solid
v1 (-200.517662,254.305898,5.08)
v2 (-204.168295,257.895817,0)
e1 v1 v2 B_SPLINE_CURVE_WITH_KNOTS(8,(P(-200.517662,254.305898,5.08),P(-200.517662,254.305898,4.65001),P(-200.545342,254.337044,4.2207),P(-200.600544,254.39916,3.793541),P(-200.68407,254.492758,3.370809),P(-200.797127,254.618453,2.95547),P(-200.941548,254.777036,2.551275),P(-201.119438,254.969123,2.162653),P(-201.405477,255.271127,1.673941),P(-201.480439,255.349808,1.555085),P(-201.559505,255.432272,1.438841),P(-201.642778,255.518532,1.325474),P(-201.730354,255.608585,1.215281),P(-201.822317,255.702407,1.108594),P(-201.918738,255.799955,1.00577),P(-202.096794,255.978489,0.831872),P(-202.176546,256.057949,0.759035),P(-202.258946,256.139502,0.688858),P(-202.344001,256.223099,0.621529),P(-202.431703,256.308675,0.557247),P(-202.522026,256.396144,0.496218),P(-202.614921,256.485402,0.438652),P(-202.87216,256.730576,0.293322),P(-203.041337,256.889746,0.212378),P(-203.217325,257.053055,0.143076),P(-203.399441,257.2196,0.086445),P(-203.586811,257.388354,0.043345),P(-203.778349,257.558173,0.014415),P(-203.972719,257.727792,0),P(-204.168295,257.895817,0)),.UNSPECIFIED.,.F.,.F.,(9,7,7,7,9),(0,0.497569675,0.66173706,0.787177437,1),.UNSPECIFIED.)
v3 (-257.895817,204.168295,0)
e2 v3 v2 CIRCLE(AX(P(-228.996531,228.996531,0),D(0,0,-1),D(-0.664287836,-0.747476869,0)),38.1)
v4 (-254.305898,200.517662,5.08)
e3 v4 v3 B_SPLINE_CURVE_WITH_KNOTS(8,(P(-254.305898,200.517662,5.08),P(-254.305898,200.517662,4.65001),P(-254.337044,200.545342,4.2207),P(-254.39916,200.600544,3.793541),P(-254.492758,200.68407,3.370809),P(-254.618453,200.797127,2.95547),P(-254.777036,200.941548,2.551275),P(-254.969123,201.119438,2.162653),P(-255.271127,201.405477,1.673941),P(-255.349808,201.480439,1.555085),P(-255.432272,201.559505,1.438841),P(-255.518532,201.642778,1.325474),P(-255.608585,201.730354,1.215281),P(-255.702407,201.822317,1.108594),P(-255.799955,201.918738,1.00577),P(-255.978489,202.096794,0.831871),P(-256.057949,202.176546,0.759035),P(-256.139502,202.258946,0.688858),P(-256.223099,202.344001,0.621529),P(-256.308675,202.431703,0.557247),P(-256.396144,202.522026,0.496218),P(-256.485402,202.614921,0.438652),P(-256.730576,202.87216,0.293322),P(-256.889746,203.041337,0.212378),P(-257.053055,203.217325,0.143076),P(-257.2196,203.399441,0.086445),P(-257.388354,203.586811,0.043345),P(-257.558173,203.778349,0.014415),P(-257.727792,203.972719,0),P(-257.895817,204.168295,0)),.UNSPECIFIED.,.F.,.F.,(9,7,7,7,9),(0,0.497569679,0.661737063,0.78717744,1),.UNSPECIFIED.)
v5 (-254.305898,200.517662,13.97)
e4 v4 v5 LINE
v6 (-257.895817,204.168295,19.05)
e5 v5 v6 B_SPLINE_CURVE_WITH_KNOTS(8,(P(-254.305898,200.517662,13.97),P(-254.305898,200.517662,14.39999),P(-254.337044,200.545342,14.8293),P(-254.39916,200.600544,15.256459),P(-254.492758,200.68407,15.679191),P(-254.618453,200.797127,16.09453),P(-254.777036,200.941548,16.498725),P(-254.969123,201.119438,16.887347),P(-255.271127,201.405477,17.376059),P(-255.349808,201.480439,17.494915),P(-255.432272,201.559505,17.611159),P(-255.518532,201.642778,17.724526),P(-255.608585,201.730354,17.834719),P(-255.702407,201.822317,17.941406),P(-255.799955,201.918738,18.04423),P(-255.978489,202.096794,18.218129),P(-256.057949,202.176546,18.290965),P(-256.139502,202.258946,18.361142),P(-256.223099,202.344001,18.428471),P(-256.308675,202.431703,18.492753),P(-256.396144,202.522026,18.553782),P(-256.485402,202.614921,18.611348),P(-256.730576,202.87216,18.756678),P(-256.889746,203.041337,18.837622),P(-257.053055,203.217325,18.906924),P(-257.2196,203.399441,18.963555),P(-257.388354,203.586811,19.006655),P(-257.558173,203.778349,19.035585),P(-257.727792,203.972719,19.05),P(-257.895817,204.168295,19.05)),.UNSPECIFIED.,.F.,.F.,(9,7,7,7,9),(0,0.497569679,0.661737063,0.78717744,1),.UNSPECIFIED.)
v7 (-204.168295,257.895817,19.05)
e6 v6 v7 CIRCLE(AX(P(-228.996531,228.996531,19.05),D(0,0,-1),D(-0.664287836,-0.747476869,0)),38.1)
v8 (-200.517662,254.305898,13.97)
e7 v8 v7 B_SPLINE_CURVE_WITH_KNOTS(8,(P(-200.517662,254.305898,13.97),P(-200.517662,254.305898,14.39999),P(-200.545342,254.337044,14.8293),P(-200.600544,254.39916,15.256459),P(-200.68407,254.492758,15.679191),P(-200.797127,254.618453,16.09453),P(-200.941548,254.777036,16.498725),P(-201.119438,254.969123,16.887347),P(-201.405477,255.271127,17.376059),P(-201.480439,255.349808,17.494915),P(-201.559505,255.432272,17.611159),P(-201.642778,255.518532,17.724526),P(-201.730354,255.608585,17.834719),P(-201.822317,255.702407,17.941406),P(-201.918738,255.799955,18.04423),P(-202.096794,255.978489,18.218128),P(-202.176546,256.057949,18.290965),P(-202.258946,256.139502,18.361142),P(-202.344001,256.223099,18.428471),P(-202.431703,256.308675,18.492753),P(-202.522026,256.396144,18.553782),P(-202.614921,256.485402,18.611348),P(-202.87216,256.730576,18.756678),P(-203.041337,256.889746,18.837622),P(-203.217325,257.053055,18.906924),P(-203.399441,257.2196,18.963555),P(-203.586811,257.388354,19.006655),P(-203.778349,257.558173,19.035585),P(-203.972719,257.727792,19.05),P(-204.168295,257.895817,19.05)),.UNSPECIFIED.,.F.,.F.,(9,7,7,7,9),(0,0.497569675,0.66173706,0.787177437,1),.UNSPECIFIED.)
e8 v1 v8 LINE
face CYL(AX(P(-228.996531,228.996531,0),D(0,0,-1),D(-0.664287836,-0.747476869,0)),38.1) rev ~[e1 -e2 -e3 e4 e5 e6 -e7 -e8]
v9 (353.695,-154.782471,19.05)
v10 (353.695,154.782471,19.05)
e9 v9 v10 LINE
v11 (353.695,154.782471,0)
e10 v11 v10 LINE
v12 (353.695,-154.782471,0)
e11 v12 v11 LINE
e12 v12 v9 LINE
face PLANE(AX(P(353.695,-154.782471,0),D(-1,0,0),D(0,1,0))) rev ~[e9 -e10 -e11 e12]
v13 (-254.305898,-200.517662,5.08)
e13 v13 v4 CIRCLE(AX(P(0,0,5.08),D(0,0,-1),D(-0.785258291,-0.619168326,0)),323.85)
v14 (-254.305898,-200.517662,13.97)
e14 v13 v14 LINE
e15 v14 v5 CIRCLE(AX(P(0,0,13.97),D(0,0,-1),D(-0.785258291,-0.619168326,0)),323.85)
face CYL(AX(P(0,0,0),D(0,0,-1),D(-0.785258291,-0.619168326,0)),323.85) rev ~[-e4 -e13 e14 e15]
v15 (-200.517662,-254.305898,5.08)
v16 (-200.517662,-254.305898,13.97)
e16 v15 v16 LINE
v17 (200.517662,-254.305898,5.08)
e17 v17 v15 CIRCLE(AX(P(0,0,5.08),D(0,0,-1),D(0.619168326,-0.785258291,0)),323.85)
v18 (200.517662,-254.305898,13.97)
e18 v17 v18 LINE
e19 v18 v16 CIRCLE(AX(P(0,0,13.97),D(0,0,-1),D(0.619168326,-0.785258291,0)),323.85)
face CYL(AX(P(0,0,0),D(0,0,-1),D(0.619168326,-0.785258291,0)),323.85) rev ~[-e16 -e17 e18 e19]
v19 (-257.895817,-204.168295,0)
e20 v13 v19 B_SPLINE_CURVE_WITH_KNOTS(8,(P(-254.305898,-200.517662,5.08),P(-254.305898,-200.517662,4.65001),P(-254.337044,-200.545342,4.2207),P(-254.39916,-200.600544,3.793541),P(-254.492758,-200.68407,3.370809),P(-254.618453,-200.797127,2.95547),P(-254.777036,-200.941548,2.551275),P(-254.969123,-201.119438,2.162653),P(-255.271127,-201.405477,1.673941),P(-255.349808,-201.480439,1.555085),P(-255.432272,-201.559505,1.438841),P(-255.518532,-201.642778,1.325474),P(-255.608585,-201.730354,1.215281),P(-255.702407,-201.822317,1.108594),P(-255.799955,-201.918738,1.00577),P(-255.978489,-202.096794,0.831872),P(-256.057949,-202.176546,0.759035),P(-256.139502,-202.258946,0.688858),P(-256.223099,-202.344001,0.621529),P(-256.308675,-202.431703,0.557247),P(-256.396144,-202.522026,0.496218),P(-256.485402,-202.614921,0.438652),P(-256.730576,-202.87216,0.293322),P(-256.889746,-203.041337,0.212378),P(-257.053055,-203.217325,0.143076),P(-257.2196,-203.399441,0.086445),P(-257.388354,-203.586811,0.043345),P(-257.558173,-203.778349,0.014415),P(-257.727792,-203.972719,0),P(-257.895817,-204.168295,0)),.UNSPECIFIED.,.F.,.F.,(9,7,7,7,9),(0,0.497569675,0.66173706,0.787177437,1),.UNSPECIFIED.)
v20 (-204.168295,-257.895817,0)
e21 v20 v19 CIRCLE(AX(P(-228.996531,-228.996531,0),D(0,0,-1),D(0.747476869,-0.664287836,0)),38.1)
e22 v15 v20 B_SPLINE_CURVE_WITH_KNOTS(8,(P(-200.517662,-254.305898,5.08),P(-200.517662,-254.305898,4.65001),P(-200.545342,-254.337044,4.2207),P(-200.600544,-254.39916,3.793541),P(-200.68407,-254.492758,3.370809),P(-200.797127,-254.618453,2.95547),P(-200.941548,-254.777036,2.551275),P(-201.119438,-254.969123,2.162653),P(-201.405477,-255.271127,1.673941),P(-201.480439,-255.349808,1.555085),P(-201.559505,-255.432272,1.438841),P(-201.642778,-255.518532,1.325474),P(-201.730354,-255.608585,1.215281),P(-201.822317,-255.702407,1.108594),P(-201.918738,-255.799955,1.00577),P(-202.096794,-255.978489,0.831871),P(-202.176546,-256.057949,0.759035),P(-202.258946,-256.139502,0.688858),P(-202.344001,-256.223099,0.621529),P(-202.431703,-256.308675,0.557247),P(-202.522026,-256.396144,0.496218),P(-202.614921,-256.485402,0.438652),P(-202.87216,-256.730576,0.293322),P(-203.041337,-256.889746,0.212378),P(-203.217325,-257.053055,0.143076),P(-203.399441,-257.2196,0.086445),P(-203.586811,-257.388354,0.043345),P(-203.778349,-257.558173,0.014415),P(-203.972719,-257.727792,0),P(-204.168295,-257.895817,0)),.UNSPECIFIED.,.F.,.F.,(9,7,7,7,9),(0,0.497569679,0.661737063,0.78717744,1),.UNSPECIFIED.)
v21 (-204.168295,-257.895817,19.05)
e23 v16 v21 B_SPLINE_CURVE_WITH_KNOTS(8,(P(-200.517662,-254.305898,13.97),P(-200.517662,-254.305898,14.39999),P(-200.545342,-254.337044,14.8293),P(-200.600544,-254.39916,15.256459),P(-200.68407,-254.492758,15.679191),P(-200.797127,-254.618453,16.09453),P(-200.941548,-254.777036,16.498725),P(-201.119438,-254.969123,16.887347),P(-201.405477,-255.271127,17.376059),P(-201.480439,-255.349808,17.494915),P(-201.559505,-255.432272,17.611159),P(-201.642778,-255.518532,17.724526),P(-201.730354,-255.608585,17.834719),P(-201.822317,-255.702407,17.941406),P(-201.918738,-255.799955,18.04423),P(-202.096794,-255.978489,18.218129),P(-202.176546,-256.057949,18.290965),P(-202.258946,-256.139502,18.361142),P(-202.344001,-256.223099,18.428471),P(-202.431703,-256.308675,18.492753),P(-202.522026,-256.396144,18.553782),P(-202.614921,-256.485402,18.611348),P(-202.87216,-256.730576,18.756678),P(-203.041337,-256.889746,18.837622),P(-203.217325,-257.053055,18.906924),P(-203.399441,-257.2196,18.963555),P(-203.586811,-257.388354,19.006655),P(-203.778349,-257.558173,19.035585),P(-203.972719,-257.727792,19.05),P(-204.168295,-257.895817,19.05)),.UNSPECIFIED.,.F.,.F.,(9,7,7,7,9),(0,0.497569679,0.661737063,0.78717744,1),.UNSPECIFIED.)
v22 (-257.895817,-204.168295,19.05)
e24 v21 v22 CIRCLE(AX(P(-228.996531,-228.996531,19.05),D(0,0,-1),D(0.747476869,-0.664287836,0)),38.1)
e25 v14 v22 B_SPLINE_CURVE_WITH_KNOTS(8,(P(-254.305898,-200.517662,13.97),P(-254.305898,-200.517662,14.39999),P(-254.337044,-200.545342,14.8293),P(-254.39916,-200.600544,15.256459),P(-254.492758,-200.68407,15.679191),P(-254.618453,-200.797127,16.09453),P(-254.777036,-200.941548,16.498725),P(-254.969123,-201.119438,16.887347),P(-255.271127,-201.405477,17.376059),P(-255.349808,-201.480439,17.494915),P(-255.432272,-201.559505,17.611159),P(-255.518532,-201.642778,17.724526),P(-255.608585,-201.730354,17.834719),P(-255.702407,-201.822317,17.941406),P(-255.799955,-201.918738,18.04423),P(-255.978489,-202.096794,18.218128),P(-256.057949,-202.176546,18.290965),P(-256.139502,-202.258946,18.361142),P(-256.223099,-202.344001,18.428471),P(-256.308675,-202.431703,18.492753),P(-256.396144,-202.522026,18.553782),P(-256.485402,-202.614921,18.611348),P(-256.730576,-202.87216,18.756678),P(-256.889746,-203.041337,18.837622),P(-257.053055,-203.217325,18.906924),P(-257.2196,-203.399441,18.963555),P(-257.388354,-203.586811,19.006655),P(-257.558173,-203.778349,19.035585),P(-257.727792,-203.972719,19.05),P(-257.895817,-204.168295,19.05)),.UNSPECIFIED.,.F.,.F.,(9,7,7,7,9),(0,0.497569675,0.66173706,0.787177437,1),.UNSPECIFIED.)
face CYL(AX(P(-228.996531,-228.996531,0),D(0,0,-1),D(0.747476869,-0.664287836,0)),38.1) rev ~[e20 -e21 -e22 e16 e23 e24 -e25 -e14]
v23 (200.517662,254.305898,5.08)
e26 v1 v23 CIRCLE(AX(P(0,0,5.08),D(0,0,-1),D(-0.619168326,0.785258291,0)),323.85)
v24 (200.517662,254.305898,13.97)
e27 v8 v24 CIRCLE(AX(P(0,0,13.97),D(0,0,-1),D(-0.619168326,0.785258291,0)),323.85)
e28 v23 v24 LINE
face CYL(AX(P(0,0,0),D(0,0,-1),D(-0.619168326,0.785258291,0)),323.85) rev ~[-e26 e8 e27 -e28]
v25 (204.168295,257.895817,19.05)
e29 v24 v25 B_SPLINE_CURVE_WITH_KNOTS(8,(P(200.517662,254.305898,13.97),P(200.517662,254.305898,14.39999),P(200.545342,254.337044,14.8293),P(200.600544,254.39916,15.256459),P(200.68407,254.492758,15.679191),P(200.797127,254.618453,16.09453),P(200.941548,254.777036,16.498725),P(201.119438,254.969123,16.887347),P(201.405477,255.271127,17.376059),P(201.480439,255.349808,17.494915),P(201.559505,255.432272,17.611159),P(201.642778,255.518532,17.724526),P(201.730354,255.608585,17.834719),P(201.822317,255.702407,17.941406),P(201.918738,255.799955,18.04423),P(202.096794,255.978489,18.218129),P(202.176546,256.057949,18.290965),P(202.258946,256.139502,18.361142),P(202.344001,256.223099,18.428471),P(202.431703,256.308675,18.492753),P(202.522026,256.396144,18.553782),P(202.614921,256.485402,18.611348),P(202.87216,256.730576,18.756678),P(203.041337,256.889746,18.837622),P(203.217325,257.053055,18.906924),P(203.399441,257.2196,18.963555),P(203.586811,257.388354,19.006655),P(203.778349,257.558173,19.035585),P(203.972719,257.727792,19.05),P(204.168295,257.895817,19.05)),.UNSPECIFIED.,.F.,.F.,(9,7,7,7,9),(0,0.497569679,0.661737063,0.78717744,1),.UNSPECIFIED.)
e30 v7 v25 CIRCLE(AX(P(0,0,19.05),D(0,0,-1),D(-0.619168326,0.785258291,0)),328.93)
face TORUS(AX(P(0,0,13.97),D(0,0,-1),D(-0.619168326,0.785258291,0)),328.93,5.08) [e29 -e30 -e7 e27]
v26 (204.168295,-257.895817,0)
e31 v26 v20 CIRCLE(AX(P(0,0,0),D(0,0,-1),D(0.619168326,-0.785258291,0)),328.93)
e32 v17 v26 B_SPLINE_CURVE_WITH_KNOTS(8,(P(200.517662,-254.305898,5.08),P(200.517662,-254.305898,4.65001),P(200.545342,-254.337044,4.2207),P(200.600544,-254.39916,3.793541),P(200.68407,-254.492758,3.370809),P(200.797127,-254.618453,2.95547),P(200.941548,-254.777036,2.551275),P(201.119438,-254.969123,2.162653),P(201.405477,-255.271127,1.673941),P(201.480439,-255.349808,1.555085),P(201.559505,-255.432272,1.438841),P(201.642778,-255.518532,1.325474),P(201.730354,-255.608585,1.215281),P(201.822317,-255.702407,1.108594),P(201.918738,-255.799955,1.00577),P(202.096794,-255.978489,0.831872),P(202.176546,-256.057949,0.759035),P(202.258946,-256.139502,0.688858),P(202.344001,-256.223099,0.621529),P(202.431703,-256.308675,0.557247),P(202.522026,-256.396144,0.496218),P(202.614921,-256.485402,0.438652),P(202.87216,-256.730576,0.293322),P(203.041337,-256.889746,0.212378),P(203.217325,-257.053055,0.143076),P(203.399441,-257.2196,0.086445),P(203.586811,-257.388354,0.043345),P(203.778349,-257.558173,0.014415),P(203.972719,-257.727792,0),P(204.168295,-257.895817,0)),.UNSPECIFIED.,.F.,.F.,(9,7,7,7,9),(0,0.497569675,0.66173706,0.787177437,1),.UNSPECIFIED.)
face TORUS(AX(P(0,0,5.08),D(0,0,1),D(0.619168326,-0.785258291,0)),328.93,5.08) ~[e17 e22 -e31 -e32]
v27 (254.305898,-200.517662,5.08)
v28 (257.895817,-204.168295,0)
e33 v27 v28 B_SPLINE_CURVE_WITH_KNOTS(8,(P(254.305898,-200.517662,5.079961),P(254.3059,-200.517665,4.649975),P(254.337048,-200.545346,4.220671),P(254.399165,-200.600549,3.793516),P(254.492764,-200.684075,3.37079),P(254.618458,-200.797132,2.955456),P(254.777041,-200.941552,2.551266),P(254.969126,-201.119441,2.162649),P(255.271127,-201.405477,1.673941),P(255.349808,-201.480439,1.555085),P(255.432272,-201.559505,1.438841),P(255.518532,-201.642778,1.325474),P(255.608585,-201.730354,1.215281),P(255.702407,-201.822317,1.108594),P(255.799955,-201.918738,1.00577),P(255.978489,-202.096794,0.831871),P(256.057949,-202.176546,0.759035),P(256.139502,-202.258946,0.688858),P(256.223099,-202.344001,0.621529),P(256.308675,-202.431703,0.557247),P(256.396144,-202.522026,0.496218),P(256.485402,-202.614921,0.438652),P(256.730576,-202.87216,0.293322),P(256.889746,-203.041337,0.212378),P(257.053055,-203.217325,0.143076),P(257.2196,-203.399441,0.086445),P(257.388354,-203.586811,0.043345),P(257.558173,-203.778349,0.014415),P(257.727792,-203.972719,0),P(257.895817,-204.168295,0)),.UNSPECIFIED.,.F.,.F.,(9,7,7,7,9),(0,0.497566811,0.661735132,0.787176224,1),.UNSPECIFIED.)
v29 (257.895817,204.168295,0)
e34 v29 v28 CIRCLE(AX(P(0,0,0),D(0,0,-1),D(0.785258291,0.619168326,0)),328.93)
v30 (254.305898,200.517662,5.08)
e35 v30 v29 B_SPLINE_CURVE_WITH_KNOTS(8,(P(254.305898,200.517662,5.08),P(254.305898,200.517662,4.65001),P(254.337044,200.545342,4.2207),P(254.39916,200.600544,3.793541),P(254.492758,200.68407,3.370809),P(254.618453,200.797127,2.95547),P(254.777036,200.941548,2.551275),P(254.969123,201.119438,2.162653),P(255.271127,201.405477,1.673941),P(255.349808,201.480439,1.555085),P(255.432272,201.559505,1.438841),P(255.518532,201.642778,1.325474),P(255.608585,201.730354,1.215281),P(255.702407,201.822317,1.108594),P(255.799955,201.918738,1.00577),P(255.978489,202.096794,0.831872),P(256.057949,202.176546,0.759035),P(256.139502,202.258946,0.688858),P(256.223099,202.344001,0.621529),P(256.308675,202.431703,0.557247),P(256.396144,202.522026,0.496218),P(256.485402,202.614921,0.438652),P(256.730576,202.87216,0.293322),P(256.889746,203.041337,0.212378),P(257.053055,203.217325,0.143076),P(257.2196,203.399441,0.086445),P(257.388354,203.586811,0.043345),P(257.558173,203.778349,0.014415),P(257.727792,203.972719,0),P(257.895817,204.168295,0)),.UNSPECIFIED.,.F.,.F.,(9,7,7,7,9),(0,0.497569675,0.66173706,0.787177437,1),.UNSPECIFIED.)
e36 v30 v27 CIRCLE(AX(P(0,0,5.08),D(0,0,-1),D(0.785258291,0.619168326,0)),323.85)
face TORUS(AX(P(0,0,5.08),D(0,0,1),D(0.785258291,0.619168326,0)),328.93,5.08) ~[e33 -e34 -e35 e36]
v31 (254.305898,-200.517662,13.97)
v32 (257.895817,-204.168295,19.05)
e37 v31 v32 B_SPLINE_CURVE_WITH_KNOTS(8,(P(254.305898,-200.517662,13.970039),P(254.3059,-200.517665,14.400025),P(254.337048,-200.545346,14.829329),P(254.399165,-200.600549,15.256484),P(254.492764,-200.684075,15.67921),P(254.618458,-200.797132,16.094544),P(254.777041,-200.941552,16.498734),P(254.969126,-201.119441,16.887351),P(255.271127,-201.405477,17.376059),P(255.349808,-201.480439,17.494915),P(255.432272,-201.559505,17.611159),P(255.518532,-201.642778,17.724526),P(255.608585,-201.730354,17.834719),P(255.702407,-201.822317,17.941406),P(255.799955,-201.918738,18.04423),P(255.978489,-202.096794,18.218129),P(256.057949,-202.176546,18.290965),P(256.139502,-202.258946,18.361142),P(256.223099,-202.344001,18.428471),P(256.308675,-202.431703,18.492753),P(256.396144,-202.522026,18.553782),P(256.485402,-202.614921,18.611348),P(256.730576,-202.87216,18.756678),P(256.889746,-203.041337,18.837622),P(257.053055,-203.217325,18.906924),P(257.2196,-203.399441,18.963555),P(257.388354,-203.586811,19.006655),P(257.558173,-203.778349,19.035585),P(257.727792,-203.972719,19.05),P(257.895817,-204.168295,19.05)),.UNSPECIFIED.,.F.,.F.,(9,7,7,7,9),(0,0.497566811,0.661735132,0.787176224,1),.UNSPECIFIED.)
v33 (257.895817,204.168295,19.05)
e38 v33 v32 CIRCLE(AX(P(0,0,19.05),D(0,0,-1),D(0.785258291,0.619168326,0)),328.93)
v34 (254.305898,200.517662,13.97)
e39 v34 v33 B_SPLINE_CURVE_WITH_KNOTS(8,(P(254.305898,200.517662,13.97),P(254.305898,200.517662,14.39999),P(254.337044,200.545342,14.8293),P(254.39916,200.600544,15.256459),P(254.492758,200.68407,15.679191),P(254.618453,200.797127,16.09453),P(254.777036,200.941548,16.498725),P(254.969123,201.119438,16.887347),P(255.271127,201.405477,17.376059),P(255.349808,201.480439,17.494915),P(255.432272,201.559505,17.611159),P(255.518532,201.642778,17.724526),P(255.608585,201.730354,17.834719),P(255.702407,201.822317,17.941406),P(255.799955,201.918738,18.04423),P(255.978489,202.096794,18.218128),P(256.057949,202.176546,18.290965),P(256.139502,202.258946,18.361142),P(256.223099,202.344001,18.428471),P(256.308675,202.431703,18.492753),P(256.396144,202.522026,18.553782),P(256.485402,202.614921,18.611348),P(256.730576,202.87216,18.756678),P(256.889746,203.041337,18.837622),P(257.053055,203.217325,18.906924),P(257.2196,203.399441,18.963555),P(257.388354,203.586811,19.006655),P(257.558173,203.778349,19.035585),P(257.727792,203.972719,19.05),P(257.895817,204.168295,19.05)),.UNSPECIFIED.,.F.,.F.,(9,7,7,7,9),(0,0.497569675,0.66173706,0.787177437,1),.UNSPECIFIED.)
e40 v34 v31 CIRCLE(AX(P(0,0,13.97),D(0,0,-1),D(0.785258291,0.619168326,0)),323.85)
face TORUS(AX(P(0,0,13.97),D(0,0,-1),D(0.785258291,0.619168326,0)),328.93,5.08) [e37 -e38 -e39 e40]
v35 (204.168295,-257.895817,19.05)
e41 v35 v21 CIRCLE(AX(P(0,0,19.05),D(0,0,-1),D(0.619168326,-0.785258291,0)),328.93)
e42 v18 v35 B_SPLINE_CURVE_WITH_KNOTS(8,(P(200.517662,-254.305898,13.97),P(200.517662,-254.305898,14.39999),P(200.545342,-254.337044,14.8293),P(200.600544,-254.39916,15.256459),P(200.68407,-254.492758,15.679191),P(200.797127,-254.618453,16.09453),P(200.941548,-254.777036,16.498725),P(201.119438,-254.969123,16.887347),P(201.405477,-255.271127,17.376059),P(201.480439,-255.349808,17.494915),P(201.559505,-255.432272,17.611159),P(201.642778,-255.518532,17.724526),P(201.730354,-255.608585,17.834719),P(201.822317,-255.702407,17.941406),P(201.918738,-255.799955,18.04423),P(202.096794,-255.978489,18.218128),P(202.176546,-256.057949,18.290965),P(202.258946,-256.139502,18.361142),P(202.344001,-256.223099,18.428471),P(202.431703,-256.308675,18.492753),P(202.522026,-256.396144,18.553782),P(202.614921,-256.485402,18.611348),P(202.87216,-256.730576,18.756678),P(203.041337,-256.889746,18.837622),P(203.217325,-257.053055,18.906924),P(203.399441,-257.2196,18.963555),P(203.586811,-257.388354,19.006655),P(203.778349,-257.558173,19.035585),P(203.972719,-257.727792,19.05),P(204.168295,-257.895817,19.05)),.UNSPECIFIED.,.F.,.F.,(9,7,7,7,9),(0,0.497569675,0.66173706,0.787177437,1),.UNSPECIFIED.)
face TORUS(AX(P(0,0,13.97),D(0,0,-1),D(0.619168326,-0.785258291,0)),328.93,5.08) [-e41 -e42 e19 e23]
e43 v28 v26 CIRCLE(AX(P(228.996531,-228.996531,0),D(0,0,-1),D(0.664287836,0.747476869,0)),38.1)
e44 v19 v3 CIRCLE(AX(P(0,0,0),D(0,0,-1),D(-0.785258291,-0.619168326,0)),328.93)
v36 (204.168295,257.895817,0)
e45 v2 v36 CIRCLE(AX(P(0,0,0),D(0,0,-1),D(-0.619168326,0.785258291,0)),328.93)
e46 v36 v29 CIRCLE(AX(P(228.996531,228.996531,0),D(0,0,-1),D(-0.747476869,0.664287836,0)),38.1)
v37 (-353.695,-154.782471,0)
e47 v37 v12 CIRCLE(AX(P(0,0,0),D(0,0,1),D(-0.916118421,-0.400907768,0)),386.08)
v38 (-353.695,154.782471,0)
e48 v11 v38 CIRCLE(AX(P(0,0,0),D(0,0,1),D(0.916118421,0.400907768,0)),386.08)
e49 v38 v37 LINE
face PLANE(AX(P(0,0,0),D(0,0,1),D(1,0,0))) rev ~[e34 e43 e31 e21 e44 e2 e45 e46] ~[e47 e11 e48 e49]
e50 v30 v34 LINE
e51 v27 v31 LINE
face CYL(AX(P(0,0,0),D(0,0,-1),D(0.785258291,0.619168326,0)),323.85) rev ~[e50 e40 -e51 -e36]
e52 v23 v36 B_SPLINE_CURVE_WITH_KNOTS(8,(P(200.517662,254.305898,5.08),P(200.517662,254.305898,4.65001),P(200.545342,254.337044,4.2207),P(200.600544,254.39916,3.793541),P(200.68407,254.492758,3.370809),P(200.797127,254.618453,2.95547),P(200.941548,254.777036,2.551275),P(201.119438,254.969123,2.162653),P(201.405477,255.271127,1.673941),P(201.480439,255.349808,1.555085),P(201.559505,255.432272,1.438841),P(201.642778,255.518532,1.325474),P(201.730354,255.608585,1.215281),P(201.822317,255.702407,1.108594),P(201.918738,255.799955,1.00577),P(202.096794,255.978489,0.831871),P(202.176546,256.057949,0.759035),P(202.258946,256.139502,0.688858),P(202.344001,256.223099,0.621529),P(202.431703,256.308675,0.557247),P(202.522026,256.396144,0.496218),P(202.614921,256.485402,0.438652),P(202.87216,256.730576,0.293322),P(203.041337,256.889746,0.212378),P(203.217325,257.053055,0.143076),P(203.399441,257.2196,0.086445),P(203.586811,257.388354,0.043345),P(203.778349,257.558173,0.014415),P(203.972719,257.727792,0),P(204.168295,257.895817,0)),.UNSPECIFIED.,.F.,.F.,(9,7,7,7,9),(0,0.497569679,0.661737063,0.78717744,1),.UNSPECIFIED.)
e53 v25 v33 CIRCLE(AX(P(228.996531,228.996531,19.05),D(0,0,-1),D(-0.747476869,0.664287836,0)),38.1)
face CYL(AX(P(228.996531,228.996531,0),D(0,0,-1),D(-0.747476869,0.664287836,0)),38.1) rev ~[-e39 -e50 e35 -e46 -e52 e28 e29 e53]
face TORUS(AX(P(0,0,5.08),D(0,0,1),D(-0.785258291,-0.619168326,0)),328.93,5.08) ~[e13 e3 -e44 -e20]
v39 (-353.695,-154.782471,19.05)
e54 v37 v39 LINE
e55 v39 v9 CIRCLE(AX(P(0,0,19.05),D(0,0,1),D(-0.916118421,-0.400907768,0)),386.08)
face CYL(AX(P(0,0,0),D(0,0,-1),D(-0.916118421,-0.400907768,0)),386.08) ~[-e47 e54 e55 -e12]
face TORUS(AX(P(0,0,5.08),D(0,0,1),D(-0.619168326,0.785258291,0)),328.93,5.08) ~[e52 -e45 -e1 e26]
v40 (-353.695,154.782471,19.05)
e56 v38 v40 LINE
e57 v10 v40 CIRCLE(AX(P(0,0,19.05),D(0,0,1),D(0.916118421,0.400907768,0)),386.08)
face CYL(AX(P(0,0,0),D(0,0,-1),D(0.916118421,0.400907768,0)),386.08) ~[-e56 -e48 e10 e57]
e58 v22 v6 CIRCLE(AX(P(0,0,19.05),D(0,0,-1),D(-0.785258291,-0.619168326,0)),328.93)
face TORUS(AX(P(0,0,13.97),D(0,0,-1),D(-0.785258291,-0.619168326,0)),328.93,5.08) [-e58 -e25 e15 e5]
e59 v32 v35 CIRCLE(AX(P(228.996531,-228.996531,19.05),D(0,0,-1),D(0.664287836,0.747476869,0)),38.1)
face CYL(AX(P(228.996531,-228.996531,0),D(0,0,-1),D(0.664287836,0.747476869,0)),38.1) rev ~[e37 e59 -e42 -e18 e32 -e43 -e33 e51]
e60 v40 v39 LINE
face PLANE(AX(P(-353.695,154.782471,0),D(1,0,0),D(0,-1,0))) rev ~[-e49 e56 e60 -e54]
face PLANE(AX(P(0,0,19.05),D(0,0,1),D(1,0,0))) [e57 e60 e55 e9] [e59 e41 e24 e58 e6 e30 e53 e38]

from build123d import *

# Parameters (mm, degrees)
F1_DEPTH = 19.05
F2_R     = 5.08


with BuildPart() as f1:
    # F0 (on Top) → F1 (new body)
    with BuildSketch(Plane.XY):
        with BuildLine():
            Line((-353.695, 0), (-353.695, -154.782471149))
            ThreePointArc((-353.695, -154.782471149), (0, -386.08), (353.695, -154.782471149))
            Line((353.695, -154.782471149), (353.695, 0))
            Line((353.695, 0), (353.695, 154.782471149))
            ThreePointArc((353.695, 154.782471149), (0, 386.08), (-353.695, 154.782471149))
            Line((-353.695, 154.782471149), (-353.695, 0))
        make_face()
        with BuildLine():
            ThreePointArc((254.3058976541, 200.51766236), (305.9704131573, 106.1175233991), (323.85, 0))
            ThreePointArc((323.85, 0), (305.9704131573, -106.1175233991), (254.3058976541, -200.51766236))
            ThreePointArc((254.3058976541, -200.51766236), (255.9372994505, -255.9372994505), (200.51766236, -254.3058976541))
            ThreePointArc((200.51766236, -254.3058976541), (0, -323.85), (-200.51766236, -254.3058976541))
            ThreePointArc((-200.51766236, -254.3058976541), (-255.9372994505, -255.9372994505), (-254.3058976541, -200.51766236))
            ThreePointArc((-254.3058976541, -200.51766236), (-323.85, 0), (-254.3058976541, 200.51766236))
            ThreePointArc((-254.3058976541, 200.51766236), (-255.9372994505, 255.9372994505), (-200.51766236, 254.3058976541))
            ThreePointArc((-200.51766236, 254.3058976541), (0, 323.85), (200.51766236, 254.3058976541))
            ThreePointArc((200.51766236, 254.3058976541), (255.9372994505, 255.9372994505), (254.3058976541, 200.51766236))
        make_face(mode=Mode.SUBTRACT)
    extrude(amount=F1_DEPTH)

    # F2
    f2_edges = [f1.edges().sort_by_distance(p)[0] for p in [
        (0, 323.85, 19.05),
        (323.85, 0, 19.05),
        (0, 323.85, 0),
        (323.85, 0, 0),
        (0, -323.85, 19.05),
        (-323.85, 0, 19.05),
        (-323.85, 0, 0),
        (0, -323.85, 0),
    ]]
    fillet(f2_edges, radius=F2_R)


solid = f1.part
